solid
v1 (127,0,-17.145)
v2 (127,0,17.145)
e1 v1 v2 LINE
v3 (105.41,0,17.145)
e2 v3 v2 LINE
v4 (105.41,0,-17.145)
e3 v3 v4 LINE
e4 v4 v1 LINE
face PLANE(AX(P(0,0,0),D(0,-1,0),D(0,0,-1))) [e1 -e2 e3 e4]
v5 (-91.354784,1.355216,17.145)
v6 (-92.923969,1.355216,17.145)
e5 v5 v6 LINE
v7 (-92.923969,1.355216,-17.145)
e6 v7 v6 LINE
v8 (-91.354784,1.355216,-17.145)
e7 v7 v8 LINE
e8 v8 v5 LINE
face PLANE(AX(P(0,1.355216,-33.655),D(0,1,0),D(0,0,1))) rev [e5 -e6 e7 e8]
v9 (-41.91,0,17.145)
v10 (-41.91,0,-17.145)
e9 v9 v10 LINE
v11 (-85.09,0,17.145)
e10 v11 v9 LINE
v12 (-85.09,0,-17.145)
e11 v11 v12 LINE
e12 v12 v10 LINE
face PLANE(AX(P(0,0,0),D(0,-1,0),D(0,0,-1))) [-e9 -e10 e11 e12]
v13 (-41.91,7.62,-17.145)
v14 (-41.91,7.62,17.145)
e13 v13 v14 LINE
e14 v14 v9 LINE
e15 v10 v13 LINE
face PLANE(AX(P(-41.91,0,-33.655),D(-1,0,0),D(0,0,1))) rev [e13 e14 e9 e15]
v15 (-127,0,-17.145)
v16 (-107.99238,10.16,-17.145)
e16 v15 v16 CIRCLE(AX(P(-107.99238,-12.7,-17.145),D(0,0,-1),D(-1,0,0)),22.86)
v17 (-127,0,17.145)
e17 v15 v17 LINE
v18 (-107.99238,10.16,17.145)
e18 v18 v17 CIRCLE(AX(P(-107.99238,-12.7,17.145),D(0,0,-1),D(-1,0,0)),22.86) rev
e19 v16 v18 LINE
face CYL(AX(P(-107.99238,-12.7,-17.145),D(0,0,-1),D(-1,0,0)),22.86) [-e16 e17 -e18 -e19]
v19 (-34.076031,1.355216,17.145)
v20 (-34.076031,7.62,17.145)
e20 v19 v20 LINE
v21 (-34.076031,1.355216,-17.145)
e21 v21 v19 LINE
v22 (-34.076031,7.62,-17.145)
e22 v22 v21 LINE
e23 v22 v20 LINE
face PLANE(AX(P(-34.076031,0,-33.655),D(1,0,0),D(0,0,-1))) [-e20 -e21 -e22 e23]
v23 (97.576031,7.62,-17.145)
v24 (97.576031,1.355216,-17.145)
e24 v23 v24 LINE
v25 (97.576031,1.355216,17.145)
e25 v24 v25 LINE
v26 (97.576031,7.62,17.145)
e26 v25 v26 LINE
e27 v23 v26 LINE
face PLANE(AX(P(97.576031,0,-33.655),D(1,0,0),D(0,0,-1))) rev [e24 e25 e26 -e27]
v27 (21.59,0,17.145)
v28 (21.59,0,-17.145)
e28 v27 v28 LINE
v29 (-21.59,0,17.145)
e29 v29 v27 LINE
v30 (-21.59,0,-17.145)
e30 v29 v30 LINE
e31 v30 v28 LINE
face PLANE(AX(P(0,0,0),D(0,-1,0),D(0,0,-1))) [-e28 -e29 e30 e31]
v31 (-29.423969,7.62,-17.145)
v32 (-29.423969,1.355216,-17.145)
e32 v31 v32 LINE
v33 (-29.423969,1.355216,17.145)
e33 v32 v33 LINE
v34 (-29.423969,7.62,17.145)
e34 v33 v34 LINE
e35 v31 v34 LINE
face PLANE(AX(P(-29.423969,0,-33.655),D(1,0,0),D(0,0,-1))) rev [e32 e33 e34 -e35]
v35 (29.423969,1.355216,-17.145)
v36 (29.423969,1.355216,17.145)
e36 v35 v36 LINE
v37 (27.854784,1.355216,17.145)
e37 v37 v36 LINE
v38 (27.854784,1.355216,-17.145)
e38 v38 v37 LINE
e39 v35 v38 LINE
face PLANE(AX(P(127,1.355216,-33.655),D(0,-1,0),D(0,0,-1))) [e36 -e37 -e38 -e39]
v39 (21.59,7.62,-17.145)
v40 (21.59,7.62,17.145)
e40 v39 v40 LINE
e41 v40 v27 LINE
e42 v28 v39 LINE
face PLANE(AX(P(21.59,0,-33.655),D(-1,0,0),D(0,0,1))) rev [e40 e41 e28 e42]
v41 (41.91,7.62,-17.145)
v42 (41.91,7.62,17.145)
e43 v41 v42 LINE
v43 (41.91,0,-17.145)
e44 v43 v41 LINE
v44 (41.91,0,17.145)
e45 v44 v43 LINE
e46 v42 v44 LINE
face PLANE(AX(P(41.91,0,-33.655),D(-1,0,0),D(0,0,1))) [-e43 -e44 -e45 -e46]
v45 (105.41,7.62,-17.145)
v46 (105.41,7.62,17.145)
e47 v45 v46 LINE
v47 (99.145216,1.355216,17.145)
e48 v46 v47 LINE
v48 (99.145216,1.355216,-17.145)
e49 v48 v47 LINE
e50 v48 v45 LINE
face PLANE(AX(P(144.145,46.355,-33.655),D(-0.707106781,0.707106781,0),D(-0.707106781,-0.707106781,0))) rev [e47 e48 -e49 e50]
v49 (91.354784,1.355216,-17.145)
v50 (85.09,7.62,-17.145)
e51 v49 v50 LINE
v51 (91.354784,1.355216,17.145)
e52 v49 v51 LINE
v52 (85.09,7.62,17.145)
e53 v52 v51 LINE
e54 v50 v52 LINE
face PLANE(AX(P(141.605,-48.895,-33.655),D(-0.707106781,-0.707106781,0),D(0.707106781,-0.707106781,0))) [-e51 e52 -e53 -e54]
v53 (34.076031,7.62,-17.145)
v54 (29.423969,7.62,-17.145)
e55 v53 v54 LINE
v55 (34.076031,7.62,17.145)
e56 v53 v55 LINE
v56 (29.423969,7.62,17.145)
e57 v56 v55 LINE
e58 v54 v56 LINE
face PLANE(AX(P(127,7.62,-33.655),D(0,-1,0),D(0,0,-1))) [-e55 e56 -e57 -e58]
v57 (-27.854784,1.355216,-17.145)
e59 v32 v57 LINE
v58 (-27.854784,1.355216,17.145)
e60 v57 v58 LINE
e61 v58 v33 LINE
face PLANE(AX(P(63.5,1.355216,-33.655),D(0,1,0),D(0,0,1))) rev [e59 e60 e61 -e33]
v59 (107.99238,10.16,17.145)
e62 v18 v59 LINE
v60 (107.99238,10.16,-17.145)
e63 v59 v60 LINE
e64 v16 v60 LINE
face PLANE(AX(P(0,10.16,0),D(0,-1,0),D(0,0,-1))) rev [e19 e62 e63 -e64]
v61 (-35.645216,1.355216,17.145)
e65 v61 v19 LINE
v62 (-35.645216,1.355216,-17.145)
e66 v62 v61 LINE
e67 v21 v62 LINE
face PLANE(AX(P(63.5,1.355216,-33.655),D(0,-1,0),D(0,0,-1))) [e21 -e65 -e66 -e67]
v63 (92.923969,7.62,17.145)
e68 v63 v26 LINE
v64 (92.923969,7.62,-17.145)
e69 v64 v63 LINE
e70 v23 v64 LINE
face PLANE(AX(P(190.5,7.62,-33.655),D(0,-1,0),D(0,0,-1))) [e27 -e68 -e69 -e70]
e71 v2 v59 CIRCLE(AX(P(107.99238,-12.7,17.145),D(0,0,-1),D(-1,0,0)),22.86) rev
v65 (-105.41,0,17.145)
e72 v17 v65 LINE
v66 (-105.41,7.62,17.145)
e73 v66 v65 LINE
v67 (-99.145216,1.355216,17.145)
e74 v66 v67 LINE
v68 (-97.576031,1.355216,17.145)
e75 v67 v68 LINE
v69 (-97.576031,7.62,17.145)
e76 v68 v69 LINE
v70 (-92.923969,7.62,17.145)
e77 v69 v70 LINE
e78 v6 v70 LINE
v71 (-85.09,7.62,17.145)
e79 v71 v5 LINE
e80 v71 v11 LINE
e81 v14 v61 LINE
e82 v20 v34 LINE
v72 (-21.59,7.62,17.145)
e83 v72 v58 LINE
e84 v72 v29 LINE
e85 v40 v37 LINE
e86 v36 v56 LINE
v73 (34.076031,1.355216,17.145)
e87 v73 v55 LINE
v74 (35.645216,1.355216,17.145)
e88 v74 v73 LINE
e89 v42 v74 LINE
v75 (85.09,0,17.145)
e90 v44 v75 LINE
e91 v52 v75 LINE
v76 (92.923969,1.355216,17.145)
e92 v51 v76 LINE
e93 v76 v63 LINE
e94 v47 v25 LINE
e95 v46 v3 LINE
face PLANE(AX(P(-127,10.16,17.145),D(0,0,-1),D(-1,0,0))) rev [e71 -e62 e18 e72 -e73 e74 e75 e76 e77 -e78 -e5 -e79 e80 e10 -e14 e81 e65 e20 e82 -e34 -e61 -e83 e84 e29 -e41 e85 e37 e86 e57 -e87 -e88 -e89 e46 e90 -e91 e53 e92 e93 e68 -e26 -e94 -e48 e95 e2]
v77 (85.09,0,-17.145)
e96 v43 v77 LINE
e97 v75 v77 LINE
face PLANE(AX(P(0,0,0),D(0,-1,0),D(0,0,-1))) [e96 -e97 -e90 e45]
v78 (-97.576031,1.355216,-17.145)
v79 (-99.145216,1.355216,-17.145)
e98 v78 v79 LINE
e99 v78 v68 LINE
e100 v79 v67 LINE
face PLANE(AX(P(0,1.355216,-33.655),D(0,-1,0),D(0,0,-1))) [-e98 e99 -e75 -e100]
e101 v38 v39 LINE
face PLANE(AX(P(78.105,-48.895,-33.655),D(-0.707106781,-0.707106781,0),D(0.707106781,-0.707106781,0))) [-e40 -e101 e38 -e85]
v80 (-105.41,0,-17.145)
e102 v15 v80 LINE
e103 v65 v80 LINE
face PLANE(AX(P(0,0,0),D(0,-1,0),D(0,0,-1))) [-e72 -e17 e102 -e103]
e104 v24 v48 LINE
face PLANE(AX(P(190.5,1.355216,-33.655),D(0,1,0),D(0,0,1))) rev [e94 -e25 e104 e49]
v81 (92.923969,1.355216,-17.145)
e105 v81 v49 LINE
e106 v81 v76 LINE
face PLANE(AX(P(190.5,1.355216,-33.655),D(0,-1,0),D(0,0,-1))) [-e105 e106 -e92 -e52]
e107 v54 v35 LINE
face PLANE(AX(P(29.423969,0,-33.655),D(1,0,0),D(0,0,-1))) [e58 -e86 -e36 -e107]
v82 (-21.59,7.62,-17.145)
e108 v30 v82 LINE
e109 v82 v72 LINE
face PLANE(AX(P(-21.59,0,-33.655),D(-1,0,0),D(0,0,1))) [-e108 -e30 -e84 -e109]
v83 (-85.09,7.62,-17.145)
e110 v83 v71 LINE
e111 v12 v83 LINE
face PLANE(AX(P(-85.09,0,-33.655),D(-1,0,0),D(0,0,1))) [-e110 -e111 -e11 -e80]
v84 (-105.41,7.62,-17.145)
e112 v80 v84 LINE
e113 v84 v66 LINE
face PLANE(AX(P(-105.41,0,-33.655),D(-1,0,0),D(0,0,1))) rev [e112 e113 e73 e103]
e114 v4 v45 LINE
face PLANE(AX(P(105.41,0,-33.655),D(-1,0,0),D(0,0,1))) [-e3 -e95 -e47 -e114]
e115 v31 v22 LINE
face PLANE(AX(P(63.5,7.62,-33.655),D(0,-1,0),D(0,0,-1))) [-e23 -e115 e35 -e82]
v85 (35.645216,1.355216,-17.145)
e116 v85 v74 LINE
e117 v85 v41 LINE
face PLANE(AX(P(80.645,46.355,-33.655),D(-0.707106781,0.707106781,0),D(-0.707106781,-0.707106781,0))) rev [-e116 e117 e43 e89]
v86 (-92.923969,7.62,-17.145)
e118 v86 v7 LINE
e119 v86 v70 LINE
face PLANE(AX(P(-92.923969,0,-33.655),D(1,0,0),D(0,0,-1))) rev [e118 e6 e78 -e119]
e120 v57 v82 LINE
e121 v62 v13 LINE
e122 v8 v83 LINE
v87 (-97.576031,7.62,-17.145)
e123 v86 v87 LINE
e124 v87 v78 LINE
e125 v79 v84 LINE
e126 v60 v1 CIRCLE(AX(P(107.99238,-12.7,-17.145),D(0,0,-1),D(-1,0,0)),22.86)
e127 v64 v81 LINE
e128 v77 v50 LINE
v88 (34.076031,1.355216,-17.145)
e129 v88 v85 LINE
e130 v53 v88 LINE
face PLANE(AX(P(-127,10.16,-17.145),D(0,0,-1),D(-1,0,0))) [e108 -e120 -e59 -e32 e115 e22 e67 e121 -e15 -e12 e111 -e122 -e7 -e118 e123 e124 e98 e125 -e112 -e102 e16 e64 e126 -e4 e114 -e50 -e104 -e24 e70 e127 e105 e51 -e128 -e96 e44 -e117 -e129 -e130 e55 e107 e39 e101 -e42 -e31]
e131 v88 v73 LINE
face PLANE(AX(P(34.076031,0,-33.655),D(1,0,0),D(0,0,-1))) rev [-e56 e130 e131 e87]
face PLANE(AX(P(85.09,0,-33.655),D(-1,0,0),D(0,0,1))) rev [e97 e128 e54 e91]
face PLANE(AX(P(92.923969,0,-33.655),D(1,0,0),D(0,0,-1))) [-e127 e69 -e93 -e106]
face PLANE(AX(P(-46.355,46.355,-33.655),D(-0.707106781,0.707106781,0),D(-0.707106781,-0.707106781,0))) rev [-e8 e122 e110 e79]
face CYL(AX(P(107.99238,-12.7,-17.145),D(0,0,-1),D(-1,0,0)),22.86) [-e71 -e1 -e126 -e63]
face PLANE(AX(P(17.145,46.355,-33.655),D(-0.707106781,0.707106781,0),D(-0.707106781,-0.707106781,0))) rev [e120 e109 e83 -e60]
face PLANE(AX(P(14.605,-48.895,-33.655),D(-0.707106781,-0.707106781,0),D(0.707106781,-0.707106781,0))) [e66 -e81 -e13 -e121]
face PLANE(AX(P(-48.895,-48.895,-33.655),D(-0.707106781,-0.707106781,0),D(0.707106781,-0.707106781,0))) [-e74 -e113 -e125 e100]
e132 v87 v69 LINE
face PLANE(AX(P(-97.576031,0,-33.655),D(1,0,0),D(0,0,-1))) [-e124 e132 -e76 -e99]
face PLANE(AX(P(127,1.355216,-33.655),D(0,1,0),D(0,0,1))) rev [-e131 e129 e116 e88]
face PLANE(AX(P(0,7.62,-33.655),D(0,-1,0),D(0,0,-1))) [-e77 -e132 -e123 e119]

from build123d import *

# Parameters (mm, degrees)
SKETCH1_W           = 254
SKETCH1_H           = 34.29
BOSS_EXTRUDE1_DEPTH = 10.16
FILLET1_R           = 22.86
CUT_EXTRUDE2_DEPTH  = 50.8
LPATTERN1_COUNT     = 4
LPATTERN1_PITCH     = 63.5


with BuildPart() as part:
    # Sketch1 → Boss-Extrude1 (new body)
    with BuildSketch(Plane(origin=(0, 0, 0), x_dir=(1, 0, 0), z_dir=(0, 1, 0))):
        Rectangle(SKETCH1_W, SKETCH1_H)
    extrude(amount=BOSS_EXTRUDE1_DEPTH)

    # Fillet1
    # the kernel refuses this fillet: 22.86 mm, written as the material it takes off along each edge
    with BuildSketch(Plane(origin=(-127, 10.16, 64.664048812), x_dir=(0, -1, 0), z_dir=(0, 0, -1)), Plane(origin=(127, 10.16, -64.664048812), x_dir=(0, -1, 0), z_dir=(0, 0, 1))) as fillet1_piece_1:
        with BuildLine():
            CenterArc((22.86, -19.007619525), FILLET1_R, 123.748988596, 56.251011404)
            Line((0, -19.007619525), (-0.4572, -19.007619525))
            Line((-0.4572, -19.007619525), (-0.4572, 0))
            Line((-0.4572, 0), (0, 0.4572))
            ThreePointArc((0, 0.4572), (5.08, 0.4572), (9.906, 0.38015239))
            Line((9.906, 0.38015239), (10.16, 0))
        make_face()
    extrude(amount=129.328097624, mode=Mode.SUBTRACT)

    # Sketch2 → Cut-Extrude2 (cut)
    with BuildSketch(Plane.XY.offset(17.145)):
        Polygon((-85.09, 0), (-85.09, 7.62), (-91.35478418, 1.35521582), (-92.92396906, 1.35521582), (-92.92396906, 7.62), (-97.57603094, 7.62), (-97.57603094, 1.35521582), (-99.14521582, 1.35521582), (-105.41, 7.62), (-105.41, 0), align=None)
    cut_extrude2 = extrude(amount=-CUT_EXTRUDE2_DEPTH, mode=Mode.SUBTRACT)

    # LPattern1: Cut-Extrude2 ×4
    with Locations(*[(i * LPATTERN1_PITCH, 0, 0) for i in range(1, LPATTERN1_COUNT)]):
        add(cut_extrude2, mode=Mode.SUBTRACT)


solid = part.part
